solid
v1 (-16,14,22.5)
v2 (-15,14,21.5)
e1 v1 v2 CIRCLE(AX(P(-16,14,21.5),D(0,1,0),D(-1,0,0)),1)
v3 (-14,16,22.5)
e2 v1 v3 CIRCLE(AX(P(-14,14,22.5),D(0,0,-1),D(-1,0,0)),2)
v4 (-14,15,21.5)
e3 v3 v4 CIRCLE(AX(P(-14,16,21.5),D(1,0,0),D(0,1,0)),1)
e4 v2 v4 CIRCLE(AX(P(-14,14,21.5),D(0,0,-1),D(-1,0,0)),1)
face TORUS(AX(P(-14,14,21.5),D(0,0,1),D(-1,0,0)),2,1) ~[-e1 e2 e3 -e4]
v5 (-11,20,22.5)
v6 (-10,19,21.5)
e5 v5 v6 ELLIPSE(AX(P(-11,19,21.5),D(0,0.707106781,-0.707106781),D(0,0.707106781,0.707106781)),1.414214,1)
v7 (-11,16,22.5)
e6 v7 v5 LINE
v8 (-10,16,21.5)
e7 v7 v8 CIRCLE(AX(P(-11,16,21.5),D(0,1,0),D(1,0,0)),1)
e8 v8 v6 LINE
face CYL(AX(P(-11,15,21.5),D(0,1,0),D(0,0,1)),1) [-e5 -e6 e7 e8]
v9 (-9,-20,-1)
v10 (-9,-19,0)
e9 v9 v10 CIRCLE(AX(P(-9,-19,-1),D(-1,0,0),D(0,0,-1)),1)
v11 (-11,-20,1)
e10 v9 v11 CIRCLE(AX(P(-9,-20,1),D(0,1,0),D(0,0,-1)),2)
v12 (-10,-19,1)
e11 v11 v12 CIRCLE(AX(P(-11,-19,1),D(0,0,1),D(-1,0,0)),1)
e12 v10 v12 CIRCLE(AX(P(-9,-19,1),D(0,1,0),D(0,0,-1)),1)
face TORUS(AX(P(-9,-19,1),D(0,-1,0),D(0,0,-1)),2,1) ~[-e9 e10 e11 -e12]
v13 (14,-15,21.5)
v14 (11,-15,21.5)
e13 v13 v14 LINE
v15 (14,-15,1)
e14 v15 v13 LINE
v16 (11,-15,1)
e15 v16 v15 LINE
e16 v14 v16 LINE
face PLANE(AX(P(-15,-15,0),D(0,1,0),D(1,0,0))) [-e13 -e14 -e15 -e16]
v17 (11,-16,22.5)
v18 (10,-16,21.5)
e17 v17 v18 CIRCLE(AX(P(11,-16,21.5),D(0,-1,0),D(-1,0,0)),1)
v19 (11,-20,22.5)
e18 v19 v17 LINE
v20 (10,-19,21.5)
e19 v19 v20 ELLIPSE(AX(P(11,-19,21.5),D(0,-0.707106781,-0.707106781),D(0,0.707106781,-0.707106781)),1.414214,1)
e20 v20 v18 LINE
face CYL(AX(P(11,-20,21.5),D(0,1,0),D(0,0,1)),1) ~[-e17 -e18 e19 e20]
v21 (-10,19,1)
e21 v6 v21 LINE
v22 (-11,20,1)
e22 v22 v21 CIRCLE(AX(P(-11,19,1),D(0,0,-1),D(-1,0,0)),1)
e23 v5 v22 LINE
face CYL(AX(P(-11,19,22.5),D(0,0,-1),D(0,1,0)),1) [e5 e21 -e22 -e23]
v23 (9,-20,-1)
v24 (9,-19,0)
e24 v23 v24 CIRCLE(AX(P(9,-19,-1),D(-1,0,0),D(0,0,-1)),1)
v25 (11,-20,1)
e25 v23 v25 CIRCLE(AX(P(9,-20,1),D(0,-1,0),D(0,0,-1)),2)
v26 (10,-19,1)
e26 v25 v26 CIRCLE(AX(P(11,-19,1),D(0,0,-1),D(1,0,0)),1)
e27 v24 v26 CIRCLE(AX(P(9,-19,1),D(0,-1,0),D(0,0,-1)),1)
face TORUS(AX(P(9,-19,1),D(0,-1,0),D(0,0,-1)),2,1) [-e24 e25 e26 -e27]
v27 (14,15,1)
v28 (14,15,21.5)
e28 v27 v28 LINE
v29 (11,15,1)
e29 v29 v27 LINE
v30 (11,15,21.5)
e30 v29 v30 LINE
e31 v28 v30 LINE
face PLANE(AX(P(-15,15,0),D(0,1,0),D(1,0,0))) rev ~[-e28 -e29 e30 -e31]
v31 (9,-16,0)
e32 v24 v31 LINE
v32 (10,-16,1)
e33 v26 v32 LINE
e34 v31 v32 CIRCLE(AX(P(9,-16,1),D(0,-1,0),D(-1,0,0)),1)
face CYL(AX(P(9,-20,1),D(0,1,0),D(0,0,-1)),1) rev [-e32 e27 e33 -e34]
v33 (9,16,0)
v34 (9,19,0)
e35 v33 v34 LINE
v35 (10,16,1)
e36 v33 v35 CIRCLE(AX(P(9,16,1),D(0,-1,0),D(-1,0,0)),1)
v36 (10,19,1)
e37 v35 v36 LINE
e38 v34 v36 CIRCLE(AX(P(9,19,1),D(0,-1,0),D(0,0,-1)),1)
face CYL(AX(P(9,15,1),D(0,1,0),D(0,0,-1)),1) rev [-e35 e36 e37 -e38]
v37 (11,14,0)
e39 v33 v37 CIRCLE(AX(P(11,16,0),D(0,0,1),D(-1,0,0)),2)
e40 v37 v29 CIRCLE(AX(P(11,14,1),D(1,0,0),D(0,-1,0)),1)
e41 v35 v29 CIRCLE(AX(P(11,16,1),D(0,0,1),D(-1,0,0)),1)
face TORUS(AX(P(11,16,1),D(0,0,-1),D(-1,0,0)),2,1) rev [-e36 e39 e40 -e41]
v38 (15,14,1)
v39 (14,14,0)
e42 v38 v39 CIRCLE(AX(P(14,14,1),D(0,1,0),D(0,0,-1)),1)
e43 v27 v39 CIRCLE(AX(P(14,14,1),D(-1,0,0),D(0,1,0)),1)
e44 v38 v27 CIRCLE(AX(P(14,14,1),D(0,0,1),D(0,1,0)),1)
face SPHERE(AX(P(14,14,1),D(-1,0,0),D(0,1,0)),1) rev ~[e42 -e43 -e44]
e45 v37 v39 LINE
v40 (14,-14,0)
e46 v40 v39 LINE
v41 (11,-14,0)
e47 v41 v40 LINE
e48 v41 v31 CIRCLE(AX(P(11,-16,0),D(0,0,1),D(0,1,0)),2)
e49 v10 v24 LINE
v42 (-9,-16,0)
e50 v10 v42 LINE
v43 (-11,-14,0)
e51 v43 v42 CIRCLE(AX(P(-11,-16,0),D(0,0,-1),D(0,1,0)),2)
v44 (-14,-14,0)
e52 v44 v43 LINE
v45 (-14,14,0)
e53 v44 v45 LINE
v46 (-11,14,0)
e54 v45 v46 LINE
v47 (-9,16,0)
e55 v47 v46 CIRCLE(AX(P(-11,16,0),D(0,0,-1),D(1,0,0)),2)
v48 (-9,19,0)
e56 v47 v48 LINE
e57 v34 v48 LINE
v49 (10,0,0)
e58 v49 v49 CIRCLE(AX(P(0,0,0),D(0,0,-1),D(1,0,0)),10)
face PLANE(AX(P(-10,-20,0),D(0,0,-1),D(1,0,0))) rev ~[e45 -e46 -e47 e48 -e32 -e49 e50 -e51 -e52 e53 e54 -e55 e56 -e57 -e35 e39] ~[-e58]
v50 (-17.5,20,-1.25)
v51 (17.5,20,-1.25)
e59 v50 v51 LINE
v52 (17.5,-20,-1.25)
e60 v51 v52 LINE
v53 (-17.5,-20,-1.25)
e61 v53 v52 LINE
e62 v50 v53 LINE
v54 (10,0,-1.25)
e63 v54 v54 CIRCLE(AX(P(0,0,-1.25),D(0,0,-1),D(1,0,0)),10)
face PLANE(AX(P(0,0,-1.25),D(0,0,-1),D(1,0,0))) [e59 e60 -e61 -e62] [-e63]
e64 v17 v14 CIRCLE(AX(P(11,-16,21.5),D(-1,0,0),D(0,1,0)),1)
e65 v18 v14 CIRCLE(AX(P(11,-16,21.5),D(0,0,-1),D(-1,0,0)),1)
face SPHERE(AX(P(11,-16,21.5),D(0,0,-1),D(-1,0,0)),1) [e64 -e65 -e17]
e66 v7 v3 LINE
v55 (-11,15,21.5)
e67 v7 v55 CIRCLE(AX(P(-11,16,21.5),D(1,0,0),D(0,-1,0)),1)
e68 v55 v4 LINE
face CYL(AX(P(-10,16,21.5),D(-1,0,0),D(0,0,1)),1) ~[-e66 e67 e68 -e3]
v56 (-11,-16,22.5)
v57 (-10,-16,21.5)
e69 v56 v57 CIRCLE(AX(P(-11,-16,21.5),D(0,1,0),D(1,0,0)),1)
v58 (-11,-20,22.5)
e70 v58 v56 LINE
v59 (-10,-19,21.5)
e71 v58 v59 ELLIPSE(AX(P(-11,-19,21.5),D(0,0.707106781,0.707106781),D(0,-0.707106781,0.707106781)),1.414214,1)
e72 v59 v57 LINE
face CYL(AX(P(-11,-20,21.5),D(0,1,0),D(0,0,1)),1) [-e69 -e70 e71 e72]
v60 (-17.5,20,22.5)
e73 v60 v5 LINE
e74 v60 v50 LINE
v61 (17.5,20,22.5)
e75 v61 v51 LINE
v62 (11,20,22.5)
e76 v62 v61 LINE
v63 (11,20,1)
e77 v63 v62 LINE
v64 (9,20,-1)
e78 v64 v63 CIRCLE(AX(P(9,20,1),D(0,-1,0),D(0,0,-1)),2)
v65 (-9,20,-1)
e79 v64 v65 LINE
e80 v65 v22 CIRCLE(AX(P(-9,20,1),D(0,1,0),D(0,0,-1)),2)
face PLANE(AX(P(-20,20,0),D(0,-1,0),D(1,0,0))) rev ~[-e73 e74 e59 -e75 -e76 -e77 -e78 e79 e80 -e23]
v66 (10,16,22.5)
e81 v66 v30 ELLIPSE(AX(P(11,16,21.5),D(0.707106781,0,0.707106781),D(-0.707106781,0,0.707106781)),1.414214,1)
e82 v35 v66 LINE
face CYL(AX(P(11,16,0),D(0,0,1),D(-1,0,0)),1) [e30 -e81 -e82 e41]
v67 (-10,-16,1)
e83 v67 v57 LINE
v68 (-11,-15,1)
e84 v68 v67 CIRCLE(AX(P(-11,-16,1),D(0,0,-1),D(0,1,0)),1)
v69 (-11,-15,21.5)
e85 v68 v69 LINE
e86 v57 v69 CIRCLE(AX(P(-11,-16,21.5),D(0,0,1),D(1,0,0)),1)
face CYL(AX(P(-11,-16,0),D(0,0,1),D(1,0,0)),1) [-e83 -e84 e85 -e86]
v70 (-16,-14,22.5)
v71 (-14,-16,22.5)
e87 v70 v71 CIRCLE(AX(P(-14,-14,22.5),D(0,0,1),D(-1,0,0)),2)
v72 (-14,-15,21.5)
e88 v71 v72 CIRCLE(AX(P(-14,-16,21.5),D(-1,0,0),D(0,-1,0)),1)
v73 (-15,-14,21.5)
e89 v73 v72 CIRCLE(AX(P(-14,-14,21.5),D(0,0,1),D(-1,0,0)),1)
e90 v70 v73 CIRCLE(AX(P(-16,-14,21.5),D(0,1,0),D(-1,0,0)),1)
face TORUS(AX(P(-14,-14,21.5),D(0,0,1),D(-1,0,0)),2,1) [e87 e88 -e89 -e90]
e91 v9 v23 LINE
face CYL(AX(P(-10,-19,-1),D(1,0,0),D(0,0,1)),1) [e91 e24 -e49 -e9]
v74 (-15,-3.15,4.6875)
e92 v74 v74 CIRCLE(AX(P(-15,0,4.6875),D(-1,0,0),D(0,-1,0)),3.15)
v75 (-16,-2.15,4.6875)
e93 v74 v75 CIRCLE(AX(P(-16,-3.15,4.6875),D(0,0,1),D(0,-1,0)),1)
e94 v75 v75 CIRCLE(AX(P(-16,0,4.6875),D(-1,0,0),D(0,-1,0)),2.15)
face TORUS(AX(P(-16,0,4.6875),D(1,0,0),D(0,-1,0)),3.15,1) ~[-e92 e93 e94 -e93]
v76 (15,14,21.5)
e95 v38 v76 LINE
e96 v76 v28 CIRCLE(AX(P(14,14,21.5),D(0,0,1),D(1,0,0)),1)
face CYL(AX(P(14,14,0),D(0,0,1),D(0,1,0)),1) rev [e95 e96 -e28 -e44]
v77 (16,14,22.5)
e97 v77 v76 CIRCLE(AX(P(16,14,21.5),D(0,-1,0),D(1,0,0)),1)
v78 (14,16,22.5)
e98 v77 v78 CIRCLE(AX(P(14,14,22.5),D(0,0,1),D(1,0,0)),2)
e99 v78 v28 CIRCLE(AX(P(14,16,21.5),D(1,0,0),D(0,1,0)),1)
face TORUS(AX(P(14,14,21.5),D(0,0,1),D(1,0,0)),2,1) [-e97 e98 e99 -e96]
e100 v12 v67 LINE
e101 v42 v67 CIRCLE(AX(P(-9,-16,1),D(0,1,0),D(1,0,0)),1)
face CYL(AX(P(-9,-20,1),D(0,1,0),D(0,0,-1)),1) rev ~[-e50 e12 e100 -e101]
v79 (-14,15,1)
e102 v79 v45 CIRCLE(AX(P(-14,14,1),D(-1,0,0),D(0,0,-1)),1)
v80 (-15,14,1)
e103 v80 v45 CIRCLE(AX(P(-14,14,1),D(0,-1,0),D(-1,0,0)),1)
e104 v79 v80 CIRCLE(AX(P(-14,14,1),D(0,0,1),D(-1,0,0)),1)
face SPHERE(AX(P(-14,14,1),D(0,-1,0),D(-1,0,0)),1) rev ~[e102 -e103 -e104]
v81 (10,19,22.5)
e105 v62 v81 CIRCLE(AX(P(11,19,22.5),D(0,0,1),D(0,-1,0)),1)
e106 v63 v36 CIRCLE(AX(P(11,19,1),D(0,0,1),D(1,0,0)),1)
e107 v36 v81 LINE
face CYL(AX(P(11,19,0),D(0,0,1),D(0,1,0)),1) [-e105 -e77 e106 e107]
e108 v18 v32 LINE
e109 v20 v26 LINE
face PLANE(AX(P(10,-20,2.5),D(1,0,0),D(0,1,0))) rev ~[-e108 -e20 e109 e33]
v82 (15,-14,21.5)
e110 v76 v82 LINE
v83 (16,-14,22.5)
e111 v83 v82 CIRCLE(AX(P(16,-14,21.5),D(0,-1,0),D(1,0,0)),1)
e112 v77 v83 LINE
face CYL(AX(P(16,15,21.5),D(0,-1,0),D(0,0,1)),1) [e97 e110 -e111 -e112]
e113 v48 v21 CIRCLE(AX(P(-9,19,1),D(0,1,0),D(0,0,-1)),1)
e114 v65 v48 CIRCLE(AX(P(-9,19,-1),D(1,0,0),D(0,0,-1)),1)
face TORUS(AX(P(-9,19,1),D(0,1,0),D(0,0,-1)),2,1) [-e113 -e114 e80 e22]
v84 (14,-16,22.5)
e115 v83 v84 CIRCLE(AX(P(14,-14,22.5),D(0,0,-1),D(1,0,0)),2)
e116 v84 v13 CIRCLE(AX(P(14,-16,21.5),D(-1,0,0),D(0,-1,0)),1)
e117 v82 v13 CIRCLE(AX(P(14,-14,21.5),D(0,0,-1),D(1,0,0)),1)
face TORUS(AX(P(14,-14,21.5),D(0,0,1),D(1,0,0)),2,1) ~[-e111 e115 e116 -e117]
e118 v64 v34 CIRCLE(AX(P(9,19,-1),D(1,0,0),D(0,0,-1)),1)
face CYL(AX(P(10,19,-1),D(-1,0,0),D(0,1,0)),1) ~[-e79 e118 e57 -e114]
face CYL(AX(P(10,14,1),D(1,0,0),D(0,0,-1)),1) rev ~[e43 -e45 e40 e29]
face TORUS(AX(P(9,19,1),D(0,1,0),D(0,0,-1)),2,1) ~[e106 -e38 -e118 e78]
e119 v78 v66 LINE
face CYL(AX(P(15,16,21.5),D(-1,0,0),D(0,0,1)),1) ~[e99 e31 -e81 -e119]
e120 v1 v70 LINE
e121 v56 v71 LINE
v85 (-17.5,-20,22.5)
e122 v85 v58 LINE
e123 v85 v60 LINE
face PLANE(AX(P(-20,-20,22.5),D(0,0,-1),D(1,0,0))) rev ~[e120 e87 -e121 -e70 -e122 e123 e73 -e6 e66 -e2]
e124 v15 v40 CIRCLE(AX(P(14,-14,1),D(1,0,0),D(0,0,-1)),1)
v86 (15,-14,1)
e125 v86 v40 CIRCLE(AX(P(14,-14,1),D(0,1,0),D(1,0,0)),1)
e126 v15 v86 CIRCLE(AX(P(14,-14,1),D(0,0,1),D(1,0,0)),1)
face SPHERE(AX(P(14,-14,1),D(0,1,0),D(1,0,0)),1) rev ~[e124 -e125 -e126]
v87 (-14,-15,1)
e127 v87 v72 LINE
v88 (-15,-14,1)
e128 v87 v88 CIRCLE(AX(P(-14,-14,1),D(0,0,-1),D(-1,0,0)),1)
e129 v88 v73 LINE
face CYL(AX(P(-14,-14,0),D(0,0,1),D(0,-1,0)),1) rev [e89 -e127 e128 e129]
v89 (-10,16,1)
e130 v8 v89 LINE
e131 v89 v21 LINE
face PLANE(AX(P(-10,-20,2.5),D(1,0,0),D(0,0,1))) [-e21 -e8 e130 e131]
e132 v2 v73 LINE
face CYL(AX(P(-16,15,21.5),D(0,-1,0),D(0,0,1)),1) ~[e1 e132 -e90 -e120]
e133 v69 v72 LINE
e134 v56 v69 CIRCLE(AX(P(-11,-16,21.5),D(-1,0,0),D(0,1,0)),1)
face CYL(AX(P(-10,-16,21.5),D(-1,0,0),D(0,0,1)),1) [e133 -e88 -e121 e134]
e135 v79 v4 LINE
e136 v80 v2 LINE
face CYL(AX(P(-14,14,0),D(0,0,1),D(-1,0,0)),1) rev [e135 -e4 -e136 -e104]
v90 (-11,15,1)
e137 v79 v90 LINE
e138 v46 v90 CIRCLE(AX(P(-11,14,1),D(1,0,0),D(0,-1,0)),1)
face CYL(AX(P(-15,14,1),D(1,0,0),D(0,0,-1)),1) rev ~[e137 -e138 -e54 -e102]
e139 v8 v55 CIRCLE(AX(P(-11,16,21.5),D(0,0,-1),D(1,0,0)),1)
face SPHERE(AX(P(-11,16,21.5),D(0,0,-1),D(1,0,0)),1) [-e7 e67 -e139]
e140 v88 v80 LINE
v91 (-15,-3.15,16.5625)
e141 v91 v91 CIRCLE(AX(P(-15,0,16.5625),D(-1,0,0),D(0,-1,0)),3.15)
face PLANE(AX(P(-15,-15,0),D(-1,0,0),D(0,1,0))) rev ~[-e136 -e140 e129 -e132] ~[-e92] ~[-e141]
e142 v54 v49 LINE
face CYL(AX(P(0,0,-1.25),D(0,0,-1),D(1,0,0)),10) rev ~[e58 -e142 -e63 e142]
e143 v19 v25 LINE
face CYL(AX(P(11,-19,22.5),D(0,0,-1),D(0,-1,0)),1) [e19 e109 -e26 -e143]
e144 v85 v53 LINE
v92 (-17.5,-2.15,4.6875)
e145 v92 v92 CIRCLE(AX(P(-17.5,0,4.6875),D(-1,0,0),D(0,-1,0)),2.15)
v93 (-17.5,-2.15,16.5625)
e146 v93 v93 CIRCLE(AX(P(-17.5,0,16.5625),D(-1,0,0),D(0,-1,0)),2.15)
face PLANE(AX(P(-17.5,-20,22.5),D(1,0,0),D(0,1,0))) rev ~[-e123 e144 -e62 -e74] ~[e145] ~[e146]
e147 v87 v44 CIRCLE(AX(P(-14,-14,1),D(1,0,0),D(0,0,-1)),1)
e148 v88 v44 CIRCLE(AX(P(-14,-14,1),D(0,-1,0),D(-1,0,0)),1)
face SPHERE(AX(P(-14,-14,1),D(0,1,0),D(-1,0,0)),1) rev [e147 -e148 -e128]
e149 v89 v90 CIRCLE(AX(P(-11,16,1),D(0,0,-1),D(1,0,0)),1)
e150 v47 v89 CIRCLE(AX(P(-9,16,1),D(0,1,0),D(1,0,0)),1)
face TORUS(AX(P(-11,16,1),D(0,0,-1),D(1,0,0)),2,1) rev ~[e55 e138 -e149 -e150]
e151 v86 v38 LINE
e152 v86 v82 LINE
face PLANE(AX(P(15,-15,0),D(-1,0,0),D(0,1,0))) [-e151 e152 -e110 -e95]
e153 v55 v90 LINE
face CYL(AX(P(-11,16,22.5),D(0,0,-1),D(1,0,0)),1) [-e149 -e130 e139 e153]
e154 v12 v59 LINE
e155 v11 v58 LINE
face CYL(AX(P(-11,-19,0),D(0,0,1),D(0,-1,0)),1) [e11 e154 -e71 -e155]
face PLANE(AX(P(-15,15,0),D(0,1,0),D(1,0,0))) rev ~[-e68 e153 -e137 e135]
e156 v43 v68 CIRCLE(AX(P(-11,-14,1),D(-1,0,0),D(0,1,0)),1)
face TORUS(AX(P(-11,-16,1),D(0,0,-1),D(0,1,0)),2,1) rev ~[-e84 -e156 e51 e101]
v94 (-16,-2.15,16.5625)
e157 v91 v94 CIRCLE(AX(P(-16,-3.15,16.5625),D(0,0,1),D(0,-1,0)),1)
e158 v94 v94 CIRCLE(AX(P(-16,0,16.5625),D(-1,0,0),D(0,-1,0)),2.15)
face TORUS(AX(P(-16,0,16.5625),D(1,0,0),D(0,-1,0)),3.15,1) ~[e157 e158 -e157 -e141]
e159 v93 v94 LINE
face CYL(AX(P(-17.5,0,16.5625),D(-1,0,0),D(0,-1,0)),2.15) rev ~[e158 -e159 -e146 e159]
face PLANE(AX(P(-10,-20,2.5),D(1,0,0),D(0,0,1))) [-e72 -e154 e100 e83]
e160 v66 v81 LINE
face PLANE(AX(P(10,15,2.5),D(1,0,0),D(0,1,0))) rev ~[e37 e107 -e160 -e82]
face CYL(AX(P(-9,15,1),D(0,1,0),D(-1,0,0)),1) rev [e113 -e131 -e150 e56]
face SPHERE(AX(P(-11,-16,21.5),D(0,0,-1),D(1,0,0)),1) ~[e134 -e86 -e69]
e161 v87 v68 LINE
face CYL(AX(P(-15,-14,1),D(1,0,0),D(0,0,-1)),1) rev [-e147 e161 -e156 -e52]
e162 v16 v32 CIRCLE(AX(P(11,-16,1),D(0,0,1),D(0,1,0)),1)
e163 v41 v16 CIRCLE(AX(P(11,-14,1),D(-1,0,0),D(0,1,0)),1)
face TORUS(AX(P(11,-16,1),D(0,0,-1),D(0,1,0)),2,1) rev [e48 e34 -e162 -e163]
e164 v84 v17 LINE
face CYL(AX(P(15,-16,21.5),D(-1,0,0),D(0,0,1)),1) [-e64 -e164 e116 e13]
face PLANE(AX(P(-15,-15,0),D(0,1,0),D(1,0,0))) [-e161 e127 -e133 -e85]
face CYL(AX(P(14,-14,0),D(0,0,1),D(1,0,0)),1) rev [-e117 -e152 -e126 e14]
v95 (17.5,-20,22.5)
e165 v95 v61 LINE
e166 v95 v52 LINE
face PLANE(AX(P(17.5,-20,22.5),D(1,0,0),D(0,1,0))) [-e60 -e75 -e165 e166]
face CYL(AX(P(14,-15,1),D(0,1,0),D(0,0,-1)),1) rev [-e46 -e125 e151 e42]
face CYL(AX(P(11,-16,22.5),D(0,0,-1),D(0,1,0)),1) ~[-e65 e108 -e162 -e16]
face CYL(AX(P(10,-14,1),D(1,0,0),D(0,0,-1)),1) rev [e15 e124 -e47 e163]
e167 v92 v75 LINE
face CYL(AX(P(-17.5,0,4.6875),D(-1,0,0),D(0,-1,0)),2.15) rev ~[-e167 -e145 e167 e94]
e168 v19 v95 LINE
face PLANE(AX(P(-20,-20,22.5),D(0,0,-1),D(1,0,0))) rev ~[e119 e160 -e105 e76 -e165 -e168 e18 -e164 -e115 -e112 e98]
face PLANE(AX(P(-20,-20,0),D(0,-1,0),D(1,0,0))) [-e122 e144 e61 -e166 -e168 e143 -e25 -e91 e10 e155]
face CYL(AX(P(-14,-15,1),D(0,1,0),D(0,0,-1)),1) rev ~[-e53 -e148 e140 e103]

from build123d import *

# Parameters (mm, degrees)
F0_W      = 40
F0_H      = 40
F0_W_2    = 30
F0_H_2    = 30
F1_DEPTH  = 25
F2_W      = 20
F2_H      = 20
F3_DEPTH  = 40.001
F4_W      = 40
F4_H      = 40
F4_W_2    = 30
F4_H_2    = 30
F5_DEPTH  = 1.25
F6_R      = 10
F7_DEPTH  = 26.251
F9_DEPTH  = 40.001
F10_DEPTH = 2.5
F11_W     = 2.5
F11_H     = 40
F12_W     = 2.5
F12_H     = 40
F13_DEPTH = 23.751
F14_R     = 2.15
F15_DEPTH = 2.5
F16_R     = 1


with BuildPart() as f1:
    # F0 (on Top) → F1 (new body)
    with BuildSketch(Plane.XY):
        Rectangle(F0_W, F0_H)
        Rectangle(F0_W_2, F0_H_2, mode=Mode.SUBTRACT)
    extrude(amount=F1_DEPTH)

    # F2 (on face) → F3 (cut, through all)
    with BuildSketch(Plane.XZ.offset(20)):
        with Locations((0, 12.5)):
            Rectangle(F2_W, F2_H)
    extrude(amount=-F3_DEPTH, mode=Mode.SUBTRACT)

    # F4 (on face) → F5 (join)
    with BuildSketch(Plane(origin=(0, 0, 0), x_dir=(1, 0, 0), z_dir=(0, 0, -1))):
        Rectangle(F4_W, F4_H)
        Rectangle(F4_W_2, F4_H_2, mode=Mode.SUBTRACT)
        Rectangle(F4_W_2, F4_H_2)
    extrude(amount=F5_DEPTH)

    # F6 (on face) → F7 (cut, through all)
    with BuildSketch(Plane(origin=(0, 0, -1.25), x_dir=(1, 0, 0), z_dir=(0, 0, -1))):
        Circle(F6_R)
    extrude(amount=-F7_DEPTH, mode=Mode.SUBTRACT)

    # F8 (on face) → F9 (cut, through all)
    with BuildSketch(Plane.XZ.offset(20)):
        Polygon((-20, 25), (-20, 22.5), (-10, 22.5), (10, 22.5), (20, 22.5), (20, 25), align=None)
    extrude(amount=-F9_DEPTH, mode=Mode.SUBTRACT)

    # F10 (cut): faces of the model
    f10_faces = [f1.faces().sort_by_distance(p)[0] for p in [
        (0, 17.5, 2.5),
        (0, -17.5, 2.5),
    ]]
    extrude(f10_faces, amount=-F10_DEPTH, mode=Mode.SUBTRACT)

    # F11 (on face) + F12 (on face) → F13 (cut, through all)
    with BuildSketch(Plane.XY.offset(22.5)):
        with Locations((-18.75, 0)):
            Rectangle(F11_W, F11_H)
    with BuildSketch(Plane.XY.offset(22.5)):
        with Locations((18.75, 0)):
            Rectangle(F12_W, F12_H)
    extrude(amount=-F13_DEPTH, mode=Mode.SUBTRACT)

    # F14 (on face) → F15 (cut)
    with BuildSketch(Plane(origin=(-17.5, 0, 0), x_dir=(0, -1, 0), z_dir=(-1, 0, 0))):
        with Locations((0, 16.5625)):
            Circle(F14_R)
        with Locations((0, 4.6875)):
            Circle(F14_R)
    extrude(amount=-F15_DEPTH, mode=Mode.SUBTRACT)

    # F16
    f16_edges = [f1.edges().sort_by_distance(p)[0] for p in [
        (-10, -20, 11.25),
        (-10, -17.5, 0),
        (-10, -15, 11.25),
        (-10, -17.5, 22.5),
        (-10, 15, 11.25),
        (-10, 17.5, 22.5),
        (-10, 20, 11.25),
        (-10, 17.5, 0),
        (10, -20, 11.25),
        (10, -17.5, 0),
        (10, -15, 11.25),
        (10, -17.5, 22.5),
        (10, 17.5, 0),
        (12.5, 15, 0),
        (10, 15, 11.25),
        (12.5, 15, 22.5),
        (15, 15, 11.25),
        (15, 0, 0),
        (15, -15, 11.25),
        (15, 0, 22.5),
        (-15, 0, 0),
        (-15, -15, 11.25),
        (-15, 15, 11.25),
        (-15, 0, 22.5),
        (-15, 2.15, 16.5625),
        (-15, 2.15, 4.6875),
        (0, -20, 0),
        (12.5, -15, 22.5),
        (-12.5, -15, 0),
        (-12.5, 15, 0),
        (0, 20, 0),
        (12.5, -15, 0),
        (-12.5, -15, 22.5),
        (-12.5, 15, 22.5),
        (10, 20, 11.25),
    ]]
    fillet(f16_edges, radius=F16_R)


solid = f1.part
